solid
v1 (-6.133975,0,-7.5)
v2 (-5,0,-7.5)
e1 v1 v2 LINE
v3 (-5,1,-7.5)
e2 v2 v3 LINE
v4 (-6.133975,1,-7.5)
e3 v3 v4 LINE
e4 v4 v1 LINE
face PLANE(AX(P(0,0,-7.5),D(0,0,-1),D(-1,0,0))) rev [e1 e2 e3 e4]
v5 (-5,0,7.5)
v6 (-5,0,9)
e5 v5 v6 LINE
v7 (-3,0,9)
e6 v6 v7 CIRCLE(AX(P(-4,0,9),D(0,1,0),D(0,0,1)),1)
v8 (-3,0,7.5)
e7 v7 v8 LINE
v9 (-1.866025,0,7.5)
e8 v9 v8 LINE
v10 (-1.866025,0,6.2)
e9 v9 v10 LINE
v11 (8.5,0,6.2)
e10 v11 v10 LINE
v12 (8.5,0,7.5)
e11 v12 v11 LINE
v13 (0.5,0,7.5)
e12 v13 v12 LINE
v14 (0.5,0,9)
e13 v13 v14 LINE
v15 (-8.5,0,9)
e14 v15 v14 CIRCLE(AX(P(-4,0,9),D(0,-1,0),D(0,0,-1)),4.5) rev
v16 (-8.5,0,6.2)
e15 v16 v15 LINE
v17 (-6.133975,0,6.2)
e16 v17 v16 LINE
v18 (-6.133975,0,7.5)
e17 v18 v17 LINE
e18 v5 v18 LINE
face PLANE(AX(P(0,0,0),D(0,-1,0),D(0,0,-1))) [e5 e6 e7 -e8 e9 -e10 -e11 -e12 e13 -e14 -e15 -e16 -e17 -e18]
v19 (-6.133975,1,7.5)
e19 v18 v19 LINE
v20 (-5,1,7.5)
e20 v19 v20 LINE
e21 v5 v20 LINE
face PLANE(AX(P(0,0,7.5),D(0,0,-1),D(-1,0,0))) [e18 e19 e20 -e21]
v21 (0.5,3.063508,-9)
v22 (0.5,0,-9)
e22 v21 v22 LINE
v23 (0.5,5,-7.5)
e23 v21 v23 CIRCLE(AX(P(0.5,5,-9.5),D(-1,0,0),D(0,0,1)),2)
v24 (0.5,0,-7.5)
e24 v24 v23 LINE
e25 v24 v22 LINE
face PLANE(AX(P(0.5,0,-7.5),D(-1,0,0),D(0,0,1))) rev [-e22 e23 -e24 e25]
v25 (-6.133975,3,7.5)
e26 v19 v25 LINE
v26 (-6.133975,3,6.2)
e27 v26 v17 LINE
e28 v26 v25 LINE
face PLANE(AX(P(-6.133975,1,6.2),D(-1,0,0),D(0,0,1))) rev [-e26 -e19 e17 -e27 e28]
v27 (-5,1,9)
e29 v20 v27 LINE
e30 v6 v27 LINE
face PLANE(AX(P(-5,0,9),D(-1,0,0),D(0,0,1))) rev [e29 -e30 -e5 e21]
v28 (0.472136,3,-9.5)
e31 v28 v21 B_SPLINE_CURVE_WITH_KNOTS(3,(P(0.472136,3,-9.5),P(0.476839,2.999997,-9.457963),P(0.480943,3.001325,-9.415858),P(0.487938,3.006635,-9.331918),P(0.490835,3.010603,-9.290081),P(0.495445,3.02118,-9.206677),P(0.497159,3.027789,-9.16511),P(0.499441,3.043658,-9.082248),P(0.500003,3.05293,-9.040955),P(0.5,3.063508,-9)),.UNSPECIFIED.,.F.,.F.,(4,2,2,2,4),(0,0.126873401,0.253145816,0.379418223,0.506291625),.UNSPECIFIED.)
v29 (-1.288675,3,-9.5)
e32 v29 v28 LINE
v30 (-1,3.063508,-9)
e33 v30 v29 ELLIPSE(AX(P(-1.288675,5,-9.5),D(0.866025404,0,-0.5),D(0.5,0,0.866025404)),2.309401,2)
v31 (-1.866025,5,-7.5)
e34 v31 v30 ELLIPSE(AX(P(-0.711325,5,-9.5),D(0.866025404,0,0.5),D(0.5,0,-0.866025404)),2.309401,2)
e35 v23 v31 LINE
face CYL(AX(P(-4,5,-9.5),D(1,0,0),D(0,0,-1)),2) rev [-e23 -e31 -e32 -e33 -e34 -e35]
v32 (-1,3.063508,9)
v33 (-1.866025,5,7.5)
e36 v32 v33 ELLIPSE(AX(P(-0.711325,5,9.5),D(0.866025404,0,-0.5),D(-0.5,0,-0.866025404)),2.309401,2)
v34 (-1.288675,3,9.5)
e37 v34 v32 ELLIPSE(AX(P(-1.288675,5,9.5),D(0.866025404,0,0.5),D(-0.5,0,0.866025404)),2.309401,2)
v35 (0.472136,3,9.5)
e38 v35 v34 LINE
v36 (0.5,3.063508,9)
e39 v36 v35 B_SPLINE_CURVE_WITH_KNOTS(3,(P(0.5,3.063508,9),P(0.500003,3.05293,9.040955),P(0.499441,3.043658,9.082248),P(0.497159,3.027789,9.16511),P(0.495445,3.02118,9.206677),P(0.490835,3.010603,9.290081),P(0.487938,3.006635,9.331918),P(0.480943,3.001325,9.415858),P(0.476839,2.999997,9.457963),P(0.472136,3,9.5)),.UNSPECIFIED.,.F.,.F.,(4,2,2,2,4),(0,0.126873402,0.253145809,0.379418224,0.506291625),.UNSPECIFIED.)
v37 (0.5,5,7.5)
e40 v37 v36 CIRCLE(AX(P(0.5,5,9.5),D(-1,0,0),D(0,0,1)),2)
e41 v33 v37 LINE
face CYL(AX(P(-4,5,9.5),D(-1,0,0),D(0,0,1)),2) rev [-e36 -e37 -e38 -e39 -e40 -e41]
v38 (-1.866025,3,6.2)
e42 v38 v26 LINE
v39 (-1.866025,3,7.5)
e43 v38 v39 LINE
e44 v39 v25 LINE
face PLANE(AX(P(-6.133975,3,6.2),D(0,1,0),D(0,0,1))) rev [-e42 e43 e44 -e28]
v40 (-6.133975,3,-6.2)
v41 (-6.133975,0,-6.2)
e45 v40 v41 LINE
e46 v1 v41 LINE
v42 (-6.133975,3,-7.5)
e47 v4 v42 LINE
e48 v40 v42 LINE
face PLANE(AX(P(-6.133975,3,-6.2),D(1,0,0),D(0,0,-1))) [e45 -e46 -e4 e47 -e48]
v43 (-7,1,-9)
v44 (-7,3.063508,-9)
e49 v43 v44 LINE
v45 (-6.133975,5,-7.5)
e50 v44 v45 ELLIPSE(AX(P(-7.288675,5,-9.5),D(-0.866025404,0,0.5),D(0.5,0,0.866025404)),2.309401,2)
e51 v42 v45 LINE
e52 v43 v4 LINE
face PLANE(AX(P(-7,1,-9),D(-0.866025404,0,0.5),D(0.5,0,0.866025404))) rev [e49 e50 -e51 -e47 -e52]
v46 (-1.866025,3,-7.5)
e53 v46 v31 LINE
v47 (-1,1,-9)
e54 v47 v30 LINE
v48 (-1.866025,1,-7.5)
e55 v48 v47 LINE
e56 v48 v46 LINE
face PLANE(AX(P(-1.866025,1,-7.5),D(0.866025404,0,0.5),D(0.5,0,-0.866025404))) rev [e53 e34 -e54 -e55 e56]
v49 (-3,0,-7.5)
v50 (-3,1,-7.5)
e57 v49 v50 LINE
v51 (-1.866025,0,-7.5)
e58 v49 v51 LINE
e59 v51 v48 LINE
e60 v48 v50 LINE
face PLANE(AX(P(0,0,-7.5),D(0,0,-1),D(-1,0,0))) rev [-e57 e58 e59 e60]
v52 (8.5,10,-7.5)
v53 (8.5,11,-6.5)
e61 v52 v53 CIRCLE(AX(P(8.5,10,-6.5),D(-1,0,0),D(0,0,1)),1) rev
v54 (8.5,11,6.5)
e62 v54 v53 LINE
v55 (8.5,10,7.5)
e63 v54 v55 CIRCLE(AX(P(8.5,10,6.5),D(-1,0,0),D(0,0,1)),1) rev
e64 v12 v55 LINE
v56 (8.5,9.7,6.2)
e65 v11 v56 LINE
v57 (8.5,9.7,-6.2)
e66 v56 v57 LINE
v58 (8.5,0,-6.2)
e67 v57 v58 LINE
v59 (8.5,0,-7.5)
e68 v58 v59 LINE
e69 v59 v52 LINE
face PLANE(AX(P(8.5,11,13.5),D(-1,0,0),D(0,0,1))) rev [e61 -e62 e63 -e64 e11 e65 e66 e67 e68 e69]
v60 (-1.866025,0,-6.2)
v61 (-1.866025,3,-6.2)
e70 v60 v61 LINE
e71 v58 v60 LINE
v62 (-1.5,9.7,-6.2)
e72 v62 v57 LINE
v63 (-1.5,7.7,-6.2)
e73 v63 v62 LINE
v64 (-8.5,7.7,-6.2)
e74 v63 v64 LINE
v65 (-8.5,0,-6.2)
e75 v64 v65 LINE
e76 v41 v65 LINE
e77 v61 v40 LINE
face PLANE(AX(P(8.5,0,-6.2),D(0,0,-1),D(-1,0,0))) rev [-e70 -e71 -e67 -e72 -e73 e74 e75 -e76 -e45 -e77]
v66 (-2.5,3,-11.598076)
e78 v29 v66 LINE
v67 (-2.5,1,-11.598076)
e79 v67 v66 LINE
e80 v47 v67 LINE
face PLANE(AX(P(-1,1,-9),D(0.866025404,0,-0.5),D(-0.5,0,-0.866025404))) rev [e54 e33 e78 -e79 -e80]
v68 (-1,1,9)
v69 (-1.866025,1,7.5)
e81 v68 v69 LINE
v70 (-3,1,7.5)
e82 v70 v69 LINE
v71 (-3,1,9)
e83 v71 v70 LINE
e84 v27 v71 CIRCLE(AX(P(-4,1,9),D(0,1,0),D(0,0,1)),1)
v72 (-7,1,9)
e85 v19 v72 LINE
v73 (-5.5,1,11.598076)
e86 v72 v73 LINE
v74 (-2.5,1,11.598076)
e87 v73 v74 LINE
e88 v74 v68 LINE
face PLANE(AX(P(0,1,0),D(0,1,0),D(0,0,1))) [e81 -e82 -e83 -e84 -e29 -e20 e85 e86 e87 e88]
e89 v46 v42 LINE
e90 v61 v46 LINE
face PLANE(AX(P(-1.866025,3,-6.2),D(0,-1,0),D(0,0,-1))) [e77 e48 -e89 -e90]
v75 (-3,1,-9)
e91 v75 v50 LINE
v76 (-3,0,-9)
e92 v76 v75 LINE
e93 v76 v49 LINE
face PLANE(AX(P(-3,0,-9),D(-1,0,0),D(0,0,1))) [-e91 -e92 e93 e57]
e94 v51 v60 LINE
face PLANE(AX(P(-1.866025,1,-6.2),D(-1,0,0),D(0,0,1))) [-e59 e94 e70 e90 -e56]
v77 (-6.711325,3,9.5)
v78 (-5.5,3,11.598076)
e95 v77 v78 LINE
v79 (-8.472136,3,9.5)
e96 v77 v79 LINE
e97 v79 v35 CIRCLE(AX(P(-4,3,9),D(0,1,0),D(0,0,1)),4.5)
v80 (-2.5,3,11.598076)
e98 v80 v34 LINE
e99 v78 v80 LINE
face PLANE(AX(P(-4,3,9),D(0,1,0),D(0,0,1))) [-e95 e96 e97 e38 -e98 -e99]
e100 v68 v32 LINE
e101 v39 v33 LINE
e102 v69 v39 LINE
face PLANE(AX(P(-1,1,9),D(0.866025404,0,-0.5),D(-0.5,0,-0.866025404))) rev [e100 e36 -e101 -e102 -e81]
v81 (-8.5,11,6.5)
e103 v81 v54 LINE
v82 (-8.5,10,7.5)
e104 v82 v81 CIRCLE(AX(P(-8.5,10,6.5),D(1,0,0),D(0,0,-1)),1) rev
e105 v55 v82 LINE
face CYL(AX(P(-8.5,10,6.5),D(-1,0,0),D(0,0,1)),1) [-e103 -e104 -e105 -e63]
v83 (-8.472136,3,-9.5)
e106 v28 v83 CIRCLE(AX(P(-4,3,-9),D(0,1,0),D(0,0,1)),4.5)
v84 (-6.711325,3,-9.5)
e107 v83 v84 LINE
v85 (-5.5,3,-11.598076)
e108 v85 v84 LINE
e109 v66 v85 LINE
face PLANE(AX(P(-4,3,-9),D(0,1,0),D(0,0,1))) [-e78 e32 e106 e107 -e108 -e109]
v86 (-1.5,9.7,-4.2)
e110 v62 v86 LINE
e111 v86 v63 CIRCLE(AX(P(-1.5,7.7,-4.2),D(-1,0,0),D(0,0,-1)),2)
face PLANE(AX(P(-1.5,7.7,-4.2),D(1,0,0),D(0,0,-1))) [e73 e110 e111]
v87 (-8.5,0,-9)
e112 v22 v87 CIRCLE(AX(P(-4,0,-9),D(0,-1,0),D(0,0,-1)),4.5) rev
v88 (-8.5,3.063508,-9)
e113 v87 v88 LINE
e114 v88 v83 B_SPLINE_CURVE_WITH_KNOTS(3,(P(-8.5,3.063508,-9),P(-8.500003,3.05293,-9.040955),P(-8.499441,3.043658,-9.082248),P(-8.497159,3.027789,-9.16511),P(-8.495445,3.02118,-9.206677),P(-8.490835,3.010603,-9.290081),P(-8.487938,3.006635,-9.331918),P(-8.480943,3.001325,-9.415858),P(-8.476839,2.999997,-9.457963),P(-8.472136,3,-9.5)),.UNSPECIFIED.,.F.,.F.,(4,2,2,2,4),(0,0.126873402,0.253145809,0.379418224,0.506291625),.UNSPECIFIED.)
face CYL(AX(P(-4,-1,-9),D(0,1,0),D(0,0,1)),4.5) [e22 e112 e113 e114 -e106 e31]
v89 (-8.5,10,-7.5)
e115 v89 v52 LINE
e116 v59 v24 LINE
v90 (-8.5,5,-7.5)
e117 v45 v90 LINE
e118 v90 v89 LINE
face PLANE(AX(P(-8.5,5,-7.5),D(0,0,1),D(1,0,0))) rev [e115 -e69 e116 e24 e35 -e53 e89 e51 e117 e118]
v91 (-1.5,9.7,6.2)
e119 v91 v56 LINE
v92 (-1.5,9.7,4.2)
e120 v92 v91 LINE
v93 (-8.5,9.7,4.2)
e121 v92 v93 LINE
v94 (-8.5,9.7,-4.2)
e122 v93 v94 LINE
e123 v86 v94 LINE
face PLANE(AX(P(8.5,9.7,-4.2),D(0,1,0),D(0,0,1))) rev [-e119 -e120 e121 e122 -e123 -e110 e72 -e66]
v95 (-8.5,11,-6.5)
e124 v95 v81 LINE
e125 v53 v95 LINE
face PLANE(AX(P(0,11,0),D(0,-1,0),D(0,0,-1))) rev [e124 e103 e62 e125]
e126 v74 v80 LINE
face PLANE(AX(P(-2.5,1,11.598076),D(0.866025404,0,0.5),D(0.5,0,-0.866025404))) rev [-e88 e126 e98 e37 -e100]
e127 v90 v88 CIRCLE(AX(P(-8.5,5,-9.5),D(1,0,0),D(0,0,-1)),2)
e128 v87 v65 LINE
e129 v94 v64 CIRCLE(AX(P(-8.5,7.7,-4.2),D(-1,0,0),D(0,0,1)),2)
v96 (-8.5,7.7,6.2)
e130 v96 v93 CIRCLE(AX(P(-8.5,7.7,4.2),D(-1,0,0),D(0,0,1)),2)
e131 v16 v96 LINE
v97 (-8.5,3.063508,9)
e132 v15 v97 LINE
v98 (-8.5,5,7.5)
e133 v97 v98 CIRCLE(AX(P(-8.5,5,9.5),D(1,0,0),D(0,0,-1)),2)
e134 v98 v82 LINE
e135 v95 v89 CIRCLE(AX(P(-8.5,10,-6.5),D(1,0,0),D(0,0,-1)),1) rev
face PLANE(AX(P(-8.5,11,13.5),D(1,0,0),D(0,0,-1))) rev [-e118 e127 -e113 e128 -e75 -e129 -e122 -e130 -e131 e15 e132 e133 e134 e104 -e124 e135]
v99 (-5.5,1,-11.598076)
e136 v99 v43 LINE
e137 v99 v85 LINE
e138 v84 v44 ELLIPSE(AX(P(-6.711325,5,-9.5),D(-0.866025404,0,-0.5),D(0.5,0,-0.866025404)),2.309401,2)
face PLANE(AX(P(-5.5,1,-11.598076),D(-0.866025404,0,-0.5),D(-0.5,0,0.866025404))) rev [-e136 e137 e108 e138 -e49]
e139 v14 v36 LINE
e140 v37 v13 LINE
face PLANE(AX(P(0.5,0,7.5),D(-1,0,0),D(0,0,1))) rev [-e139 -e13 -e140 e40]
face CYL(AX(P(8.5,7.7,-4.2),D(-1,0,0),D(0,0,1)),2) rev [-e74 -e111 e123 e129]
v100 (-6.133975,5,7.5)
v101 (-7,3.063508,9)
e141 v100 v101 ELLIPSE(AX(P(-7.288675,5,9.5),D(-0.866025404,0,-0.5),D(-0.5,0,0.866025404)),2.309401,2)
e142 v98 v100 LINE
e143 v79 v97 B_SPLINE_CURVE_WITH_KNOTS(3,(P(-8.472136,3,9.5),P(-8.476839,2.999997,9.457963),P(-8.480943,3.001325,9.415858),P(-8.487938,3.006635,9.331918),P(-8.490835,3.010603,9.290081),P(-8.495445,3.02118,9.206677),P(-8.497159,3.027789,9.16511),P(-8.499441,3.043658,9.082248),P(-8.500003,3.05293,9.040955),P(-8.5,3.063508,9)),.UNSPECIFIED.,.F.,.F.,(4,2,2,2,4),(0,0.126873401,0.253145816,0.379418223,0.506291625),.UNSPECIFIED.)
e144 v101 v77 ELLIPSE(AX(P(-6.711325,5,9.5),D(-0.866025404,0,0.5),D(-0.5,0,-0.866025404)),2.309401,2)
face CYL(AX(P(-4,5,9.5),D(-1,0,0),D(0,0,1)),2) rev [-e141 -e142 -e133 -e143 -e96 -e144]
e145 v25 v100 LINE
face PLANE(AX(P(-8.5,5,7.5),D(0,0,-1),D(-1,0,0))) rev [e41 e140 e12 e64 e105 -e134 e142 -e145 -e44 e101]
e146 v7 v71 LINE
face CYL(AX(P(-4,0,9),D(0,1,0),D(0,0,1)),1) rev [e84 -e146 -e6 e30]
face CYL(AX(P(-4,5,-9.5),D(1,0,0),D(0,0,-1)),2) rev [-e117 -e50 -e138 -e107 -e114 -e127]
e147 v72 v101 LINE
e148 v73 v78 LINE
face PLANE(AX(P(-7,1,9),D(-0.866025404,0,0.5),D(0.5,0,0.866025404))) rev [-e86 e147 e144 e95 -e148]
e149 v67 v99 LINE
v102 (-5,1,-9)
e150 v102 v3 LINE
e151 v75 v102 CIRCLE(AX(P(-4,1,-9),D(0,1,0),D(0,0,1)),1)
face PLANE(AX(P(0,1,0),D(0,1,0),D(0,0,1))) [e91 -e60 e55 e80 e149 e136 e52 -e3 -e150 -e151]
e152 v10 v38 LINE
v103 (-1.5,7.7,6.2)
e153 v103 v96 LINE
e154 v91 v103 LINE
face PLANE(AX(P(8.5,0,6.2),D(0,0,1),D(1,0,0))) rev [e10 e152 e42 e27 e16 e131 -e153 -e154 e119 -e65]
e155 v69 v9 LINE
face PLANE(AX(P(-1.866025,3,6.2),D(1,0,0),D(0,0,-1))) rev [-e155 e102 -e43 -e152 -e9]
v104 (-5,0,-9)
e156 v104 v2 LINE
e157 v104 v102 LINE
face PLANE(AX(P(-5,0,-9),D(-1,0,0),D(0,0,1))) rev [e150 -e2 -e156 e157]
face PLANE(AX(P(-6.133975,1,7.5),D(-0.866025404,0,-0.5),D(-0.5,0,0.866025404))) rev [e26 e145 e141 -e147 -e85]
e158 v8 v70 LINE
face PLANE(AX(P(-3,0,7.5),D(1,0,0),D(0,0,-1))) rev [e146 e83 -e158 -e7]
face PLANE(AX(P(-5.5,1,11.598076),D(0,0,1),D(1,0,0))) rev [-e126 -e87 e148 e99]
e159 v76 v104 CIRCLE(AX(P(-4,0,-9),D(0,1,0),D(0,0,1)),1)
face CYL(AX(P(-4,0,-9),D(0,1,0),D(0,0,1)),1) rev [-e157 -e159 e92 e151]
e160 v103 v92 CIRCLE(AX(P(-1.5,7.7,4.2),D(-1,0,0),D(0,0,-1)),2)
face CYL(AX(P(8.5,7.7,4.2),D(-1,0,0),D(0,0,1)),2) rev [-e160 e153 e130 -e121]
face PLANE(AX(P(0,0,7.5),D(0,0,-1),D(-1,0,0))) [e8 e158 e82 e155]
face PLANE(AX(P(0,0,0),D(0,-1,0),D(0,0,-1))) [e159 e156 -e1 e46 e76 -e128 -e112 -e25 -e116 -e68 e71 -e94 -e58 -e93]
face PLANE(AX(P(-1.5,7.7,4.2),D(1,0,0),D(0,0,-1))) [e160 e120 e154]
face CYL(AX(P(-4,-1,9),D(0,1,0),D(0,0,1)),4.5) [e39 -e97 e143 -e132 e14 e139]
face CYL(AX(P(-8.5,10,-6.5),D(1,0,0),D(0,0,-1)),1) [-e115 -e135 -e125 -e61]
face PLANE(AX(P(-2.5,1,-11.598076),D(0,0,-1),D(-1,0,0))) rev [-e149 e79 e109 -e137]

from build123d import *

# Parameters (mm, degrees)
CROQUIS1_W              = 17
CROQUIS1_H              = 27
SALIENTE_EXTRUIR1_DEPTH = 11
CROQUIS2_W              = 17
CROQUIS2_H              = 6
CORTAR_EXTRUIR1_DEPTH   = 6
CROQUIS3_W              = 8
CROQUIS3_H              = 5
CORTAR_EXTRUIR2_DEPTH   = 6
CROQUIS4_W              = 8
CROQUIS4_H              = 5
CORTAR_EXTRUIR3_DEPTH   = 6
CORTAR_EXTRUIR8_DEPTH   = 6
CORTAR_EXTRUIR16_DEPTH  = 2
CORTAR_EXTRUIR17_DEPTH  = 2
CORTAR_EXTRUIR18_DEPTH  = 2
REDONDEO5_START         = -1
REDONDEO5_DEPTH         = 1.04658
REDONDEO5_START_2       = -7.65058
REDONDEO5_2_DEPTH       = 0.804
REDONDEO5_START_3       = -1.866025504
REDONDEO5_3_DEPTH       = 2.366025504
REDONDEO5_START_4       = -8.5
REDONDEO5_4_DEPTH       = 0.84942
REDONDEO5_START_5       = -6.84658
REDONDEO5_5_DEPTH       = 0.712605404
REDONDEO5_START_6       = 3
REDONDEO5_6_DEPTH       = 3
CORTAR_EXTRUIR19_DEPTH  = 17
CORTAR_EXTRUIR20_START  = -10
CORTAR_EXTRUIR20_DEPTH  = 10
REDONDEO6_R             = 1
CORTAR_EXTRUIR21_DEPTH  = 1
CORTAR_EXTRUIR22_DEPTH  = 1
CORTAR_EXTRUIR26_DEPTH  = 1.3
CROQUIS17_W             = 4.267949192
CROQUIS17_H             = 2
CORTAR_EXTRUIR27_DEPTH  = 1.3
CROQUIS19_W             = 4.267949192
CROQUIS19_H             = 1
CORTAR_EXTRUIR28_DEPTH  = 1.3
CROQUIS20_W             = 4.267949192
CROQUIS20_H             = 1
CORTAR_EXTRUIR29_DEPTH  = 1.3


with BuildPart() as part:
    # Croquis1 → Saliente-Extruir1 (new body)
    with BuildSketch(Plane(origin=(0, 0, 0), x_dir=(1, 0, 0), z_dir=(0, 1, 0))):
        Rectangle(CROQUIS1_W, CROQUIS1_H)
    extrude(amount=SALIENTE_EXTRUIR1_DEPTH)

    # Croquis2 → Cortar-Extruir1 (cut)
    with BuildSketch(Plane(origin=(0, 11, 0), x_dir=(1, 0, 0), z_dir=(0, 1, 0))):
        with Locations((0, 10.5)):
            Rectangle(CROQUIS2_W, CROQUIS2_H)
        with Locations((0, -10.5)):
            Rectangle(CROQUIS2_W, CROQUIS2_H)
    extrude(amount=-CORTAR_EXTRUIR1_DEPTH, mode=Mode.SUBTRACT)

    # Croquis3 → Cortar-Extruir2 (cut)
    with BuildSketch(Plane.XY.offset(13.5)):
        with Locations((4.5, 2.5)):
            Rectangle(CROQUIS3_W, CROQUIS3_H)
    extrude(amount=-CORTAR_EXTRUIR2_DEPTH, mode=Mode.SUBTRACT)

    # Croquis4 → Cortar-Extruir3 (cut)
    with BuildSketch(Plane(origin=(0, 0, -13.5), x_dir=(-1, 0, 0), z_dir=(0, 0, -1))):
        with Locations((-4.5, 2.5)):
            Rectangle(CROQUIS4_W, CROQUIS4_H)
    extrude(amount=-CORTAR_EXTRUIR3_DEPTH, mode=Mode.SUBTRACT)

    # Croquis5 → Cortar-Extruir8 (cut)
    with BuildSketch(Plane(origin=(0, 5, 0), x_dir=(1, 0, 0), z_dir=(0, 1, 0))):
        with BuildLine():
            Line((-8.5, 13.5), (-8.5, 9))
            ThreePointArc((-8.5, 9), (-7.181980515, 12.181980515), (-4, 13.5))
            Line((-4, 13.5), (-8.5, 13.5))
        make_face()
        with BuildLine():
            Line((0.5, 13.5), (-4, 13.5))
            ThreePointArc((-4, 13.5), (-0.818019485, 12.181980515), (0.5, 9))
            Line((0.5, 9), (0.5, 13.5))
        make_face()
        with BuildLine():
            ThreePointArc((-4, -13.5), (-7.181980515, -12.181980515), (-8.5, -9))
            Line((-8.5, -9), (-8.5, -13.5))
            Line((-8.5, -13.5), (-4, -13.5))
        make_face()
        with BuildLine():
            ThreePointArc((0.5, -9), (-0.818019485, -12.181980515), (-4, -13.5))
            Line((-4, -13.5), (0.5, -13.5))
            Line((0.5, -13.5), (0.5, -9))
        make_face()
    extrude(amount=-CORTAR_EXTRUIR8_DEPTH, mode=Mode.SUBTRACT)

    # Croquis7 → Cortar-Extruir16 (cut)
    with BuildSketch(Plane(origin=(0, 5, 0), x_dir=(1, 0, 0), z_dir=(0, 1, 0))):
        with BuildLine():
            Line((-8.5, 7.5), (-8.5, 9))
            ThreePointArc((-8.5, 9), (-4, 13.5), (0.5, 9))
            Line((0.5, 9), (0.5, 7.5))
            Line((0.5, 7.5), (-8.5, 7.5))
        make_face()
        with BuildLine():
            Line((-8.5, -9), (-8.5, -7.5))
            Line((-8.5, -7.5), (0.5, -7.5))
            Line((0.5, -7.5), (0.5, -9))
            ThreePointArc((0.5, -9), (-4, -13.5), (-8.5, -9))
        make_face()
    extrude(amount=-CORTAR_EXTRUIR16_DEPTH, mode=Mode.SUBTRACT)

    # Croquis10 → Cortar-Extruir17 (cut)
    with BuildSketch(Plane(origin=(0, 3, 0), x_dir=(1, 0, 0), z_dir=(0, 1, 0))):
        Polygon((-6.133974596, 7.5), (-1.866025404, 7.5), (-1, 9), (-2.5, 11.598076211), (-5.5, 11.598076211), (-7, 9), align=None)
    extrude(amount=-CORTAR_EXTRUIR17_DEPTH, mode=Mode.SUBTRACT)

    # Croquis11 → Cortar-Extruir18 (cut)
    with BuildSketch(Plane(origin=(0, 3, 0), x_dir=(1, 0, 0), z_dir=(0, 1, 0))):
        Polygon((-6.133974596, -7.5), (-1.866025404, -7.5), (-1, -9), (-2.5, -11.598076211), (-5.5, -11.598076211), (-7, -9), align=None)
    extrude(amount=-CORTAR_EXTRUIR18_DEPTH, mode=Mode.SUBTRACT)

    # Redondeo5: read off the stored shape, not the designer's step
    # Redondeo5 outline → Redondeo5 (add)
    with BuildSketch(Plane.YZ.offset(REDONDEO5_START)):
        with BuildLine():
            Line((3, 7.5), (5, 7.5))
            ThreePointArc((5, 7.5), (3.585786438, 8.085786438), (3, 9.5))
            Line((3, 9.5), (3, 7.5))
        make_face()
        with BuildLine():
            ThreePointArc((3, -9.5), (3.585786438, -8.085786438), (5, -7.5))
            Line((5, -7.5), (3, -7.5))
            Line((3, -7.5), (3, -9.5))
        make_face()
    extrude(amount=REDONDEO5_DEPTH)

    # Redondeo5 2 outline → Redondeo5 2 (add)
    with BuildSketch(Plane.YZ.offset(REDONDEO5_START_2)):
        with BuildLine():
            Line((3, 7.5), (5, 7.5))
            ThreePointArc((5, 7.5), (3.585786438, 8.085786438), (3, 9.5))
            Line((3, 9.5), (3, 7.5))
        make_face()
        with BuildLine():
            ThreePointArc((3, -9.5), (3.585786438, -8.085786438), (5, -7.5))
            Line((5, -7.5), (3, -7.5))
            Line((3, -7.5), (3, -9.5))
        make_face()
    extrude(amount=REDONDEO5_2_DEPTH)

    # Redondeo5 3 outline → Redondeo5 3 (add)
    with BuildSketch(Plane.YZ.offset(REDONDEO5_START_3)):
        with BuildLine():
            Line((3, 7.5), (5, 7.5))
            ThreePointArc((5, 7.5), (3.585786438, 8.085786438), (3, 9.5))
            Line((3, 9.5), (3, 7.5))
        make_face()
        with BuildLine():
            ThreePointArc((3, -9.5), (3.585786438, -8.085786438), (5, -7.5))
            Line((5, -7.5), (3, -7.5))
            Line((3, -7.5), (3, -9.5))
        make_face()
    extrude(amount=REDONDEO5_3_DEPTH)

    # Redondeo5 4 outline → Redondeo5 4 (add)
    with BuildSketch(Plane.YZ.offset(REDONDEO5_START_4)):
        with BuildLine():
            Line((3, 7.5), (5, 7.5))
            ThreePointArc((5, 7.5), (3.585786438, 8.085786438), (3, 9.5))
            Line((3, 9.5), (3, 7.5))
        make_face()
        with BuildLine():
            ThreePointArc((3, -9.5), (3.585786438, -8.085786438), (5, -7.5))
            Line((5, -7.5), (3, -7.5))
            Line((3, -7.5), (3, -9.5))
        make_face()
    extrude(amount=REDONDEO5_4_DEPTH)

    # Redondeo5 5 outline → Redondeo5 5 (add)
    with BuildSketch(Plane.YZ.offset(REDONDEO5_START_5)):
        with BuildLine():
            Line((3, 7.5), (5, 7.5))
            ThreePointArc((5, 7.5), (3.585786438, 8.085786438), (3, 9.5))
            Line((3, 9.5), (3, 7.5))
        make_face()
        with BuildLine():
            ThreePointArc((3, -9.5), (3.585786438, -8.085786438), (5, -7.5))
            Line((5, -7.5), (3, -7.5))
            Line((3, -7.5), (3, -9.5))
        make_face()
    extrude(amount=REDONDEO5_5_DEPTH)

    # Redondeo5 6 outline → Redondeo5 6 (cut)
    with BuildSketch(Plane(origin=(0, 0, 0), x_dir=(1, 0, 0), z_dir=(0, 1, 0)).offset(REDONDEO5_START_6)):
        with BuildLine():
            ThreePointArc((0.472135955, 9.5), (0.493028589, 9.250387902), (0.5, 9))
            Line((0.5, 9), (0.5, 9.5))
            Line((0.5, 9.5), (0.472135955, 9.5))
        make_face()
        Polygon((-7, 9), (-6.133974596, 7.5), (-6.133974596, 9.5), (-6.711324865, 9.5), align=None)
        Polygon((-1.866025504, 9.5), (-1.866025504, 7.5), (-1, 9), (-1.288675135, 9.5), align=None)
        with BuildLine():
            Line((-8.5, 9.5), (-8.5, 9))
            ThreePointArc((-8.5, 9), (-8.493028589, 9.250387902), (-8.472135955, 9.5))
            Line((-8.472135955, 9.5), (-8.5, 9.5))
        make_face()
        with BuildLine():
            Line((-8.5, -9), (-8.5, -9.5))
            Line((-8.5, -9.5), (-8.472135955, -9.5))
            ThreePointArc((-8.472135955, -9.5), (-8.493028589, -9.250387902), (-8.5, -9))
        make_face()
        Polygon((-1.866025504, -9.5), (-1.288675135, -9.5), (-1, -9), (-1.866025404, -7.5), align=None)
        Polygon((-6.711324865, -9.5), (-6.133974596, -9.5), (-6.133974596, -7.5), (-7, -9), align=None)
        with BuildLine():
            ThreePointArc((0.5, -9), (0.493028589, -9.250387902), (0.472135955, -9.5))
            Line((0.472135955, -9.5), (0.5, -9.5))
            Line((0.5, -9.5), (0.5, -9))
        make_face()
    extrude(amount=REDONDEO5_6_DEPTH, mode=Mode.SUBTRACT)

    # Croquis12 → Cortar-Extruir19 (cut)
    with BuildSketch(Plane.ZY.offset(8.5)):
        with BuildLine():
            Line((-6.2, 0), (6.2, 0))
            Line((6.2, 0), (6.2, 7.7))
            ThreePointArc((6.2, 7.7), (5.614213562, 9.114213562), (4.2, 9.7))
            Line((4.2, 9.7), (-4.2, 9.7))
            ThreePointArc((-4.2, 9.7), (-5.614213562, 9.114213562), (-6.2, 7.7))
            Line((-6.2, 7.7), (-6.2, 0))
        make_face()
    extrude(amount=-CORTAR_EXTRUIR19_DEPTH, mode=Mode.SUBTRACT)

    # Croquis13 → Cortar-Extruir20 (cut)
    with BuildSketch(Plane(origin=(8.5, 0, 0), x_dir=(0, 0, -1), z_dir=(1, 0, 0)).offset(CORTAR_EXTRUIR20_START)):
        with BuildLine():
            Line((-6.2, 7.7), (-6.2, 9.7))
            Line((-6.2, 9.7), (-4.2, 9.7))
            ThreePointArc((-4.2, 9.7), (-5.614213562, 9.114213562), (-6.2, 7.7))
        make_face()
        with BuildLine():
            Line((6.2, 7.7), (6.2, 9.7))
            Line((6.2, 9.7), (4.2, 9.7))
            ThreePointArc((4.2, 9.7), (5.614213562, 9.114213562), (6.2, 7.7))
        make_face()
    extrude(amount=CORTAR_EXTRUIR20_DEPTH, mode=Mode.SUBTRACT)

    # Redondeo6
    redondeo6_edges = [part.edges().sort_by_distance(p)[0] for p in [
        (0, 11, -7.5),
        (0, 11, 7.5),
    ]]
    fillet(redondeo6_edges, radius=REDONDEO6_R)

    # Croquis14 → Cortar-Extruir21 (cut)
    with BuildSketch(Plane(origin=(0, 1, 0), x_dir=(1, 0, 0), z_dir=(0, 1, 0))):
        with BuildLine():
            Line((-5, 9), (-5, 7.5))
            Line((-5, 7.5), (-3, 7.5))
            Line((-3, 7.5), (-3, 9))
            ThreePointArc((-3, 9), (-4, 10), (-5, 9))
        make_face()
    extrude(amount=-CORTAR_EXTRUIR21_DEPTH, mode=Mode.SUBTRACT)

    # Croquis15 → Cortar-Extruir22 (cut)
    with BuildSketch(Plane(origin=(0, 1, 0), x_dir=(1, 0, 0), z_dir=(0, 1, 0))):
        with BuildLine():
            Line((-5, -9), (-5, -7.5))
            Line((-5, -7.5), (-3, -7.5))
            Line((-3, -7.5), (-3, -9))
            ThreePointArc((-3, -9), (-4, -10), (-5, -9))
        make_face()
    extrude(amount=-CORTAR_EXTRUIR22_DEPTH, mode=Mode.SUBTRACT)

    # Croquis16 → Cortar-Extruir26 (cut)
    with BuildSketch(Plane(origin=(0, 0, -7.5), x_dir=(-1, 0, 0), z_dir=(0, 0, -1))):
        Polygon((1.866025404, 3), (6.133974596, 3), (6.133974596, 1), (5, 1), (3, 1), (1.866025404, 1), align=None)
    extrude(amount=-CORTAR_EXTRUIR26_DEPTH, mode=Mode.SUBTRACT)

    # Croquis17 → Cortar-Extruir27 (cut)
    with BuildSketch(Plane.XY.offset(7.5)):
        with Locations((-4, 2)):
            Rectangle(CROQUIS17_W, CROQUIS17_H)
    extrude(amount=-CORTAR_EXTRUIR27_DEPTH, mode=Mode.SUBTRACT)

    # Croquis19 → Cortar-Extruir28 (cut)
    with BuildSketch(Plane(origin=(0, 0, 6.2), x_dir=(-1, 0, 0), z_dir=(0, 0, -1))):
        with Locations((4, 0.5)):
            Rectangle(CROQUIS19_W, CROQUIS19_H)
    extrude(amount=-CORTAR_EXTRUIR28_DEPTH, mode=Mode.SUBTRACT)

    # Croquis20 → Cortar-Extruir29 (cut)
    with BuildSketch(Plane.XY.offset(-6.2)):
        with Locations((-4, 0.5)):
            Rectangle(CROQUIS20_W, CROQUIS20_H)
    extrude(amount=-CORTAR_EXTRUIR29_DEPTH, mode=Mode.SUBTRACT)


solid = part.part
